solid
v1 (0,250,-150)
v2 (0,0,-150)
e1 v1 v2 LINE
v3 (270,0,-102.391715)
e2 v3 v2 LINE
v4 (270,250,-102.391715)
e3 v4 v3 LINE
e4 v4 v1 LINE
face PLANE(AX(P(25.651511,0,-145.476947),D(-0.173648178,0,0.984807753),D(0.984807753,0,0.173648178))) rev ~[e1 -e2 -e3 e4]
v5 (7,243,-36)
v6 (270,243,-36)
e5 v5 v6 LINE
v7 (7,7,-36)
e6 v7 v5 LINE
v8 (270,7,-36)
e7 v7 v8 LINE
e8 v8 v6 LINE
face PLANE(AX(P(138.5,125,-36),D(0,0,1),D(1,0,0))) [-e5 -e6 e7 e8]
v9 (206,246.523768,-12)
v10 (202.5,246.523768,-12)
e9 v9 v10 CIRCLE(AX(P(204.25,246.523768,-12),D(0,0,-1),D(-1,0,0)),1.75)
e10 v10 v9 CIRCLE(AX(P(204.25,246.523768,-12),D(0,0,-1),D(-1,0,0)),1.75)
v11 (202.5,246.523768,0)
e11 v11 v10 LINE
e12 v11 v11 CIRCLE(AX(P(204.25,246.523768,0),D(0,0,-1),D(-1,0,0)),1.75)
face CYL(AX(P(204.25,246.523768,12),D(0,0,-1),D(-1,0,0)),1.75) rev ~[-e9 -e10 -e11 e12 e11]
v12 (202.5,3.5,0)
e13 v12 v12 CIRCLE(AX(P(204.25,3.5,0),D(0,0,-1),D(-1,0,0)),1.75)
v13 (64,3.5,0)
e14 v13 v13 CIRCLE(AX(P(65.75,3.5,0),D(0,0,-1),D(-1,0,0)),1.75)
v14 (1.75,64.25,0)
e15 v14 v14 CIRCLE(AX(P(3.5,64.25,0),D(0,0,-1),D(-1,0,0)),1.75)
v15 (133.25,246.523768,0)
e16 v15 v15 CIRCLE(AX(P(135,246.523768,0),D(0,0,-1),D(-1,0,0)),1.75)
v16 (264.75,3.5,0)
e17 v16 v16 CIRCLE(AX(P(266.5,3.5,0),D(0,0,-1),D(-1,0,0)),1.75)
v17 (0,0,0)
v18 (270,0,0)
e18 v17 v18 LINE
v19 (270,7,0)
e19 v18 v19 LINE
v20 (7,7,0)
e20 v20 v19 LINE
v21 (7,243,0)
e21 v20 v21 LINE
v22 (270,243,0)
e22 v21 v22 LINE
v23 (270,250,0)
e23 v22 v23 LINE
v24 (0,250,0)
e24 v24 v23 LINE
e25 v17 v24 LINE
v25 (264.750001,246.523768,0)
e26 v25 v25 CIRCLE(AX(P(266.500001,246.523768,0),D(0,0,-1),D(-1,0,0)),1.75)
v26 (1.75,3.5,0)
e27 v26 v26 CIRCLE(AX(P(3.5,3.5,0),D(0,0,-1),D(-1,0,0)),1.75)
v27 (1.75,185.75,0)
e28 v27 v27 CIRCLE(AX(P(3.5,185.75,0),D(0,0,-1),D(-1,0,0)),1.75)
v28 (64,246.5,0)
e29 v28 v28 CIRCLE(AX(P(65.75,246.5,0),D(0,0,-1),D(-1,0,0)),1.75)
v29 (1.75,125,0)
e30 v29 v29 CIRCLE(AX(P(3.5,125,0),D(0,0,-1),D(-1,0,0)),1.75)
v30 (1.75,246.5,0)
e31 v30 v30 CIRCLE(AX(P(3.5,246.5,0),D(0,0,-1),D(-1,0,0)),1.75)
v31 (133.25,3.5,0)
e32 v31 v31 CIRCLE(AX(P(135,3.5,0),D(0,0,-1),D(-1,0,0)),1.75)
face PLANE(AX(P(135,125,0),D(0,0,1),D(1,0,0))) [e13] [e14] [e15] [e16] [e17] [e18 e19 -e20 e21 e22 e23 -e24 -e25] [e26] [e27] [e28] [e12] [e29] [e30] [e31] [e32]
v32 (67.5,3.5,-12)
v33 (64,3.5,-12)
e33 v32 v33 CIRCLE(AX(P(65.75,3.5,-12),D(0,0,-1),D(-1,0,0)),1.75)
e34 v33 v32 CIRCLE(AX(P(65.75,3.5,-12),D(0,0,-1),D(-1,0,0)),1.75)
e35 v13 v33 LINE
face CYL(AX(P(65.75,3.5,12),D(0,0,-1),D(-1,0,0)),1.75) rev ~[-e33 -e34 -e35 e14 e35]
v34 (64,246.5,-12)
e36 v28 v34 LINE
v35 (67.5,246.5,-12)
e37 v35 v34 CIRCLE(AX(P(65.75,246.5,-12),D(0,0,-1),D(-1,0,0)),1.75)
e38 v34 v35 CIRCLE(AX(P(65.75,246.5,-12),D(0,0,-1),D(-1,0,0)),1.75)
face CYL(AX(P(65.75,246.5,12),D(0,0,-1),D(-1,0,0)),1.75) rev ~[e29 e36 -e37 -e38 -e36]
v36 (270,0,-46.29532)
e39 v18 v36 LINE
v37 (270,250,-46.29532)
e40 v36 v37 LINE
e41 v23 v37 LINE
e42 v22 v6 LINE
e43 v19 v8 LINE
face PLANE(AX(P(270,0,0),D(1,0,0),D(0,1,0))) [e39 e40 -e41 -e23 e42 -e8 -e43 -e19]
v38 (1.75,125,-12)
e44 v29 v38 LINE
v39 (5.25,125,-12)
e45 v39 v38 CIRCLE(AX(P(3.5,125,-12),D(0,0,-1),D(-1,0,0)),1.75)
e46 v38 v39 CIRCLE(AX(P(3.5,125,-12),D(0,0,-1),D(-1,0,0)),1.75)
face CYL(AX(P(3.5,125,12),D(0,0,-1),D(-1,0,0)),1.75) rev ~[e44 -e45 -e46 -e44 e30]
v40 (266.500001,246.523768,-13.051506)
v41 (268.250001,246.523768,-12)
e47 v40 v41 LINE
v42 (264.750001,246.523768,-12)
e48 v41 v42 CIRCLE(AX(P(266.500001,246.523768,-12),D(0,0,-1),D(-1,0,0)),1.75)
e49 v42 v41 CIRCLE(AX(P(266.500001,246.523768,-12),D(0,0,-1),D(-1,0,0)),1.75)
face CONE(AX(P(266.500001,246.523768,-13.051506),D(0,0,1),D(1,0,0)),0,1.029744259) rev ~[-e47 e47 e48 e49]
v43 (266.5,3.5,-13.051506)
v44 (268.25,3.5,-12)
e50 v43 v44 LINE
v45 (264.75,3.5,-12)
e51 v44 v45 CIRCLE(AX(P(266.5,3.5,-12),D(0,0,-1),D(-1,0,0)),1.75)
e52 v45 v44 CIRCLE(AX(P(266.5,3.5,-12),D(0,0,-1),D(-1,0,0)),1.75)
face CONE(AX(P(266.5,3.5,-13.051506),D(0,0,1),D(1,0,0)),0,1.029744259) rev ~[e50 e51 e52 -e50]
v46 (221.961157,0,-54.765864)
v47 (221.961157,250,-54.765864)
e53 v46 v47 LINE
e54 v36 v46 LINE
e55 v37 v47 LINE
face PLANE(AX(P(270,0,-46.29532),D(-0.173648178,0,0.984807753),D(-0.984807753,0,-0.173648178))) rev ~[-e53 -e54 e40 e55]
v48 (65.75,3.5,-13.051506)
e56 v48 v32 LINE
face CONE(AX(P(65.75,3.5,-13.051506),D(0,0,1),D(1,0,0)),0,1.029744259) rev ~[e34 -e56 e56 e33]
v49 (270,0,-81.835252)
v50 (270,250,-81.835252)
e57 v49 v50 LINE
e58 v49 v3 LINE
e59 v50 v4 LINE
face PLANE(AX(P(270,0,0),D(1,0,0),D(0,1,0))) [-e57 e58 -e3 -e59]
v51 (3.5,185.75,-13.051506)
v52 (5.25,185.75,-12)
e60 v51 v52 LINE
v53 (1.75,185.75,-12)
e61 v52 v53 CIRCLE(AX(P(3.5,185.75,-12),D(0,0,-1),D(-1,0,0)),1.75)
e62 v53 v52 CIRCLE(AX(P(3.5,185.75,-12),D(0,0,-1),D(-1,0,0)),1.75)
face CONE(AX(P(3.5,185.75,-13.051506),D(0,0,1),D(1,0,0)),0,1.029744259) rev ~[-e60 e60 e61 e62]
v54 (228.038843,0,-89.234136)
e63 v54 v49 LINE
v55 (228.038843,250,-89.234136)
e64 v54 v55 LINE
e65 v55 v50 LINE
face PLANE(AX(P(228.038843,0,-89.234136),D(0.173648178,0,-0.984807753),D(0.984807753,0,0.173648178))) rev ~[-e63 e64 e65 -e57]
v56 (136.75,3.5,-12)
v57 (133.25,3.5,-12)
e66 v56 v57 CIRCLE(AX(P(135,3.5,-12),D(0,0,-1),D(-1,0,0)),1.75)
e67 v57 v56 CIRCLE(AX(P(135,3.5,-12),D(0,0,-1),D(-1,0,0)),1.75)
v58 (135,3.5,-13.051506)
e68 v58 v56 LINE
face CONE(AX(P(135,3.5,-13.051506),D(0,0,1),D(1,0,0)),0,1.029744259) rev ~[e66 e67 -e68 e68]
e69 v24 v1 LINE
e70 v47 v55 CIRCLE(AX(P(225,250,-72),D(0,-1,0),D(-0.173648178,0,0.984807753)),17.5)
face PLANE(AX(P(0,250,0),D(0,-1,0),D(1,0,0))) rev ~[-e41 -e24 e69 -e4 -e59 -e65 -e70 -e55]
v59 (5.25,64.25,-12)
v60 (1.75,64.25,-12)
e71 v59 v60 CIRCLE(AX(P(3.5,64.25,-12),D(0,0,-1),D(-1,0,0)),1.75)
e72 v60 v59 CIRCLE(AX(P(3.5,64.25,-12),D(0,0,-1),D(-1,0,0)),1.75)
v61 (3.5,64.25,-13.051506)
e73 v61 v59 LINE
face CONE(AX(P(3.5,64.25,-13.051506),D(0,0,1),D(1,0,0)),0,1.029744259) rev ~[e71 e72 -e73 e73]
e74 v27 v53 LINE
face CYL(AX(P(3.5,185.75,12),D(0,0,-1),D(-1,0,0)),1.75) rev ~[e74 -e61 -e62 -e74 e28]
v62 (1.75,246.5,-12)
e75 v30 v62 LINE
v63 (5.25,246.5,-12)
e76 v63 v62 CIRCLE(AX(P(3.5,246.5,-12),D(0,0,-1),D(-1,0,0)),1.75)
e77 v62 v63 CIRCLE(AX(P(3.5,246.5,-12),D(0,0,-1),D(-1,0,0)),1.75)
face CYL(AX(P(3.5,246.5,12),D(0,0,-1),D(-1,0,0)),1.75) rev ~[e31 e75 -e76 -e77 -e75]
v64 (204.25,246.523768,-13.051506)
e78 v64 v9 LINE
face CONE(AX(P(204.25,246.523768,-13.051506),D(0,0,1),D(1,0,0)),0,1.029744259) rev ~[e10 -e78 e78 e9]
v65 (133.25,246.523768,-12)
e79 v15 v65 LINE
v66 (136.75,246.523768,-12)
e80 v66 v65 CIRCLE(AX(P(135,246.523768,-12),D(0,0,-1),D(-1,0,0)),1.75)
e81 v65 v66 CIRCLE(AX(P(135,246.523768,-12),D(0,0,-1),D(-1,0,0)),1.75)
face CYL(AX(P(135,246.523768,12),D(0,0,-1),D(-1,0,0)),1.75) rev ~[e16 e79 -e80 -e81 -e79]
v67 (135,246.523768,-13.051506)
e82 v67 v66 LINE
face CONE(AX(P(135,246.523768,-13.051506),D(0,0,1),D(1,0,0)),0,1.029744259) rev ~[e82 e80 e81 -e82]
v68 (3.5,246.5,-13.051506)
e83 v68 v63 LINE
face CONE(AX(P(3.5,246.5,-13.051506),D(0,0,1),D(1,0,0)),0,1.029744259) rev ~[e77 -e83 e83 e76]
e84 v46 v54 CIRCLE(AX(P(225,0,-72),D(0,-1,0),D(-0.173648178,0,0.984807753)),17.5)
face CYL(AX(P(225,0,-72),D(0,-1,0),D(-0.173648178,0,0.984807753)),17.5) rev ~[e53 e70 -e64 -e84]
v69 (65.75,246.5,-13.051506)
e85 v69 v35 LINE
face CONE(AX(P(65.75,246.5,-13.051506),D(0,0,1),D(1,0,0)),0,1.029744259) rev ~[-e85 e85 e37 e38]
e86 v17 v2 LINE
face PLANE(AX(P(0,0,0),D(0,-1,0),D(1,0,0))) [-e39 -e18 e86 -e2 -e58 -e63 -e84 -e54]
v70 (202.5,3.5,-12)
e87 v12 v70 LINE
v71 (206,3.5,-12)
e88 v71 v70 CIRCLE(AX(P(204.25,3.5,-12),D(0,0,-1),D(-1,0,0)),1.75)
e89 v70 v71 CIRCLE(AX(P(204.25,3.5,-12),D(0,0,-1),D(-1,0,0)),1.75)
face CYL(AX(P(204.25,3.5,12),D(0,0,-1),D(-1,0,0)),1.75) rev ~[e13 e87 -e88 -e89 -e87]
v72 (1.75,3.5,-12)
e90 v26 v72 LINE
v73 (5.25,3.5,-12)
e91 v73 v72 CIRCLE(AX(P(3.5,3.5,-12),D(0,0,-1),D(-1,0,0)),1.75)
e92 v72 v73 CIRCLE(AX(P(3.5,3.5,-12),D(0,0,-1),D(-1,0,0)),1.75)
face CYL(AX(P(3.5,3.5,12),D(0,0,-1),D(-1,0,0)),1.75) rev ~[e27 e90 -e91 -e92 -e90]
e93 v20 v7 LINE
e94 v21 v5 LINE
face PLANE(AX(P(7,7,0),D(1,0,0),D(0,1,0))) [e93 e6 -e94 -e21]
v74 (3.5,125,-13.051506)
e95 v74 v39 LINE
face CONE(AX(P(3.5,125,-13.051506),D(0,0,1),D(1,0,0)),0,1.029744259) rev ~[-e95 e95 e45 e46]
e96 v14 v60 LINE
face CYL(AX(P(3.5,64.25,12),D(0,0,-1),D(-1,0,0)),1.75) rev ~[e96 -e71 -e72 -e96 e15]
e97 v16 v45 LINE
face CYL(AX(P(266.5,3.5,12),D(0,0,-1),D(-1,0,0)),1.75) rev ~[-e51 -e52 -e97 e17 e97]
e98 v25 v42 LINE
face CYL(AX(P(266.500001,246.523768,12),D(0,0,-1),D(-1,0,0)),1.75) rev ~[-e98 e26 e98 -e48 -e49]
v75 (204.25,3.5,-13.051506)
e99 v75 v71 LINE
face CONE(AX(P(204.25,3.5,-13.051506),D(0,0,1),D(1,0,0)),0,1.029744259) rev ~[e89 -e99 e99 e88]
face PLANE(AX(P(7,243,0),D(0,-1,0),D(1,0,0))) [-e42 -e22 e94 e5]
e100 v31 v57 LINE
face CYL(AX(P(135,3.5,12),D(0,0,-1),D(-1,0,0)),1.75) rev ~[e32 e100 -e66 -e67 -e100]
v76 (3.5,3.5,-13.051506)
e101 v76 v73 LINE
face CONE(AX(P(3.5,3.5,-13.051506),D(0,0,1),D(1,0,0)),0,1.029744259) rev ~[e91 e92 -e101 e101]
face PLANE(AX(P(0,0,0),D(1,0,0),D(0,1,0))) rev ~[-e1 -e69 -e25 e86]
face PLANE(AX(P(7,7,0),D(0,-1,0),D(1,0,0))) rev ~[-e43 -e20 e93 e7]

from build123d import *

# Parameters (mm, degrees)
F0_W      = 270
F0_H      = 250
F4_REACH  = 517.9673898595
F5_W      = 263
F5_H      = 236
F6_DEPTH  = 36
F8_DEPTH  = 250.001
F10_D     = 3.5
F10_DEPTH = 12
F10_TIP   = 1.0515060833


with BuildPart() as f4:
    f4_end = Plane(origin=(25.6515107494, 0, -145.4769465589), x_dir=(0.984807753, 0, 0.1736481777), z_dir=(-0.1736481777, 0, 0.984807753))
    # F0 (on Top) → F4 (new body, up to a plane its end follows)
    with BuildSketch(Plane.XY):
        with Locations((135, 125)):
            Rectangle(F0_W, F0_H)
    f4_long = extrude(amount=-F4_REACH, mode=Mode.PRIVATE)
    add(split(f4_long, bisect_by=f4_end, keep=Keep.TOP, mode=Mode.PRIVATE))

    # F5 (on face) → F6 (cut)
    with BuildSketch(Plane.XY):
        with Locations((138.5, 125)):
            Rectangle(F5_W, F5_H)
    extrude(amount=-F6_DEPTH, mode=Mode.SUBTRACT)

    # F7 (on face) → F8 (cut, through all)
    with BuildSketch(Plane.XZ):
        with BuildLine():
            Line((270, -46.2953201601), (221.9611568908, -54.7658643223))
            ThreePointArc((221.9611568908, -54.7658643223), (207.7658643223, -75.0388431092), (228.0388431092, -89.2341356777))
            Line((228.0388431092, -89.2341356777), (270, -81.8352515761))
            Line((270, -81.8352515761), (270, -46.2953201601))
        make_face()
    extrude(amount=-F8_DEPTH, mode=Mode.SUBTRACT)

    # F10
    with Locations(Plane.XY):
        with Locations((3.5, 64.25), (3.5, 125), (3.5, 185.75), (3.5, 246.5), (3.5, 3.5), (65.75, 3.5), (135, 3.5), (204.25, 3.5), (266.5, 3.5), (266.500000929, 246.5237677097), (204.25, 246.5237677097), (135, 246.5237677097), (65.75, 246.5)):
            Hole(F10_D / 2, depth=F10_DEPTH)
            with Locations((0, 0, -(F10_DEPTH + F10_TIP / 2))):  # 118° drill point
                Cone(0, F10_D / 2, F10_TIP, mode=Mode.SUBTRACT)


solid = f4.part
